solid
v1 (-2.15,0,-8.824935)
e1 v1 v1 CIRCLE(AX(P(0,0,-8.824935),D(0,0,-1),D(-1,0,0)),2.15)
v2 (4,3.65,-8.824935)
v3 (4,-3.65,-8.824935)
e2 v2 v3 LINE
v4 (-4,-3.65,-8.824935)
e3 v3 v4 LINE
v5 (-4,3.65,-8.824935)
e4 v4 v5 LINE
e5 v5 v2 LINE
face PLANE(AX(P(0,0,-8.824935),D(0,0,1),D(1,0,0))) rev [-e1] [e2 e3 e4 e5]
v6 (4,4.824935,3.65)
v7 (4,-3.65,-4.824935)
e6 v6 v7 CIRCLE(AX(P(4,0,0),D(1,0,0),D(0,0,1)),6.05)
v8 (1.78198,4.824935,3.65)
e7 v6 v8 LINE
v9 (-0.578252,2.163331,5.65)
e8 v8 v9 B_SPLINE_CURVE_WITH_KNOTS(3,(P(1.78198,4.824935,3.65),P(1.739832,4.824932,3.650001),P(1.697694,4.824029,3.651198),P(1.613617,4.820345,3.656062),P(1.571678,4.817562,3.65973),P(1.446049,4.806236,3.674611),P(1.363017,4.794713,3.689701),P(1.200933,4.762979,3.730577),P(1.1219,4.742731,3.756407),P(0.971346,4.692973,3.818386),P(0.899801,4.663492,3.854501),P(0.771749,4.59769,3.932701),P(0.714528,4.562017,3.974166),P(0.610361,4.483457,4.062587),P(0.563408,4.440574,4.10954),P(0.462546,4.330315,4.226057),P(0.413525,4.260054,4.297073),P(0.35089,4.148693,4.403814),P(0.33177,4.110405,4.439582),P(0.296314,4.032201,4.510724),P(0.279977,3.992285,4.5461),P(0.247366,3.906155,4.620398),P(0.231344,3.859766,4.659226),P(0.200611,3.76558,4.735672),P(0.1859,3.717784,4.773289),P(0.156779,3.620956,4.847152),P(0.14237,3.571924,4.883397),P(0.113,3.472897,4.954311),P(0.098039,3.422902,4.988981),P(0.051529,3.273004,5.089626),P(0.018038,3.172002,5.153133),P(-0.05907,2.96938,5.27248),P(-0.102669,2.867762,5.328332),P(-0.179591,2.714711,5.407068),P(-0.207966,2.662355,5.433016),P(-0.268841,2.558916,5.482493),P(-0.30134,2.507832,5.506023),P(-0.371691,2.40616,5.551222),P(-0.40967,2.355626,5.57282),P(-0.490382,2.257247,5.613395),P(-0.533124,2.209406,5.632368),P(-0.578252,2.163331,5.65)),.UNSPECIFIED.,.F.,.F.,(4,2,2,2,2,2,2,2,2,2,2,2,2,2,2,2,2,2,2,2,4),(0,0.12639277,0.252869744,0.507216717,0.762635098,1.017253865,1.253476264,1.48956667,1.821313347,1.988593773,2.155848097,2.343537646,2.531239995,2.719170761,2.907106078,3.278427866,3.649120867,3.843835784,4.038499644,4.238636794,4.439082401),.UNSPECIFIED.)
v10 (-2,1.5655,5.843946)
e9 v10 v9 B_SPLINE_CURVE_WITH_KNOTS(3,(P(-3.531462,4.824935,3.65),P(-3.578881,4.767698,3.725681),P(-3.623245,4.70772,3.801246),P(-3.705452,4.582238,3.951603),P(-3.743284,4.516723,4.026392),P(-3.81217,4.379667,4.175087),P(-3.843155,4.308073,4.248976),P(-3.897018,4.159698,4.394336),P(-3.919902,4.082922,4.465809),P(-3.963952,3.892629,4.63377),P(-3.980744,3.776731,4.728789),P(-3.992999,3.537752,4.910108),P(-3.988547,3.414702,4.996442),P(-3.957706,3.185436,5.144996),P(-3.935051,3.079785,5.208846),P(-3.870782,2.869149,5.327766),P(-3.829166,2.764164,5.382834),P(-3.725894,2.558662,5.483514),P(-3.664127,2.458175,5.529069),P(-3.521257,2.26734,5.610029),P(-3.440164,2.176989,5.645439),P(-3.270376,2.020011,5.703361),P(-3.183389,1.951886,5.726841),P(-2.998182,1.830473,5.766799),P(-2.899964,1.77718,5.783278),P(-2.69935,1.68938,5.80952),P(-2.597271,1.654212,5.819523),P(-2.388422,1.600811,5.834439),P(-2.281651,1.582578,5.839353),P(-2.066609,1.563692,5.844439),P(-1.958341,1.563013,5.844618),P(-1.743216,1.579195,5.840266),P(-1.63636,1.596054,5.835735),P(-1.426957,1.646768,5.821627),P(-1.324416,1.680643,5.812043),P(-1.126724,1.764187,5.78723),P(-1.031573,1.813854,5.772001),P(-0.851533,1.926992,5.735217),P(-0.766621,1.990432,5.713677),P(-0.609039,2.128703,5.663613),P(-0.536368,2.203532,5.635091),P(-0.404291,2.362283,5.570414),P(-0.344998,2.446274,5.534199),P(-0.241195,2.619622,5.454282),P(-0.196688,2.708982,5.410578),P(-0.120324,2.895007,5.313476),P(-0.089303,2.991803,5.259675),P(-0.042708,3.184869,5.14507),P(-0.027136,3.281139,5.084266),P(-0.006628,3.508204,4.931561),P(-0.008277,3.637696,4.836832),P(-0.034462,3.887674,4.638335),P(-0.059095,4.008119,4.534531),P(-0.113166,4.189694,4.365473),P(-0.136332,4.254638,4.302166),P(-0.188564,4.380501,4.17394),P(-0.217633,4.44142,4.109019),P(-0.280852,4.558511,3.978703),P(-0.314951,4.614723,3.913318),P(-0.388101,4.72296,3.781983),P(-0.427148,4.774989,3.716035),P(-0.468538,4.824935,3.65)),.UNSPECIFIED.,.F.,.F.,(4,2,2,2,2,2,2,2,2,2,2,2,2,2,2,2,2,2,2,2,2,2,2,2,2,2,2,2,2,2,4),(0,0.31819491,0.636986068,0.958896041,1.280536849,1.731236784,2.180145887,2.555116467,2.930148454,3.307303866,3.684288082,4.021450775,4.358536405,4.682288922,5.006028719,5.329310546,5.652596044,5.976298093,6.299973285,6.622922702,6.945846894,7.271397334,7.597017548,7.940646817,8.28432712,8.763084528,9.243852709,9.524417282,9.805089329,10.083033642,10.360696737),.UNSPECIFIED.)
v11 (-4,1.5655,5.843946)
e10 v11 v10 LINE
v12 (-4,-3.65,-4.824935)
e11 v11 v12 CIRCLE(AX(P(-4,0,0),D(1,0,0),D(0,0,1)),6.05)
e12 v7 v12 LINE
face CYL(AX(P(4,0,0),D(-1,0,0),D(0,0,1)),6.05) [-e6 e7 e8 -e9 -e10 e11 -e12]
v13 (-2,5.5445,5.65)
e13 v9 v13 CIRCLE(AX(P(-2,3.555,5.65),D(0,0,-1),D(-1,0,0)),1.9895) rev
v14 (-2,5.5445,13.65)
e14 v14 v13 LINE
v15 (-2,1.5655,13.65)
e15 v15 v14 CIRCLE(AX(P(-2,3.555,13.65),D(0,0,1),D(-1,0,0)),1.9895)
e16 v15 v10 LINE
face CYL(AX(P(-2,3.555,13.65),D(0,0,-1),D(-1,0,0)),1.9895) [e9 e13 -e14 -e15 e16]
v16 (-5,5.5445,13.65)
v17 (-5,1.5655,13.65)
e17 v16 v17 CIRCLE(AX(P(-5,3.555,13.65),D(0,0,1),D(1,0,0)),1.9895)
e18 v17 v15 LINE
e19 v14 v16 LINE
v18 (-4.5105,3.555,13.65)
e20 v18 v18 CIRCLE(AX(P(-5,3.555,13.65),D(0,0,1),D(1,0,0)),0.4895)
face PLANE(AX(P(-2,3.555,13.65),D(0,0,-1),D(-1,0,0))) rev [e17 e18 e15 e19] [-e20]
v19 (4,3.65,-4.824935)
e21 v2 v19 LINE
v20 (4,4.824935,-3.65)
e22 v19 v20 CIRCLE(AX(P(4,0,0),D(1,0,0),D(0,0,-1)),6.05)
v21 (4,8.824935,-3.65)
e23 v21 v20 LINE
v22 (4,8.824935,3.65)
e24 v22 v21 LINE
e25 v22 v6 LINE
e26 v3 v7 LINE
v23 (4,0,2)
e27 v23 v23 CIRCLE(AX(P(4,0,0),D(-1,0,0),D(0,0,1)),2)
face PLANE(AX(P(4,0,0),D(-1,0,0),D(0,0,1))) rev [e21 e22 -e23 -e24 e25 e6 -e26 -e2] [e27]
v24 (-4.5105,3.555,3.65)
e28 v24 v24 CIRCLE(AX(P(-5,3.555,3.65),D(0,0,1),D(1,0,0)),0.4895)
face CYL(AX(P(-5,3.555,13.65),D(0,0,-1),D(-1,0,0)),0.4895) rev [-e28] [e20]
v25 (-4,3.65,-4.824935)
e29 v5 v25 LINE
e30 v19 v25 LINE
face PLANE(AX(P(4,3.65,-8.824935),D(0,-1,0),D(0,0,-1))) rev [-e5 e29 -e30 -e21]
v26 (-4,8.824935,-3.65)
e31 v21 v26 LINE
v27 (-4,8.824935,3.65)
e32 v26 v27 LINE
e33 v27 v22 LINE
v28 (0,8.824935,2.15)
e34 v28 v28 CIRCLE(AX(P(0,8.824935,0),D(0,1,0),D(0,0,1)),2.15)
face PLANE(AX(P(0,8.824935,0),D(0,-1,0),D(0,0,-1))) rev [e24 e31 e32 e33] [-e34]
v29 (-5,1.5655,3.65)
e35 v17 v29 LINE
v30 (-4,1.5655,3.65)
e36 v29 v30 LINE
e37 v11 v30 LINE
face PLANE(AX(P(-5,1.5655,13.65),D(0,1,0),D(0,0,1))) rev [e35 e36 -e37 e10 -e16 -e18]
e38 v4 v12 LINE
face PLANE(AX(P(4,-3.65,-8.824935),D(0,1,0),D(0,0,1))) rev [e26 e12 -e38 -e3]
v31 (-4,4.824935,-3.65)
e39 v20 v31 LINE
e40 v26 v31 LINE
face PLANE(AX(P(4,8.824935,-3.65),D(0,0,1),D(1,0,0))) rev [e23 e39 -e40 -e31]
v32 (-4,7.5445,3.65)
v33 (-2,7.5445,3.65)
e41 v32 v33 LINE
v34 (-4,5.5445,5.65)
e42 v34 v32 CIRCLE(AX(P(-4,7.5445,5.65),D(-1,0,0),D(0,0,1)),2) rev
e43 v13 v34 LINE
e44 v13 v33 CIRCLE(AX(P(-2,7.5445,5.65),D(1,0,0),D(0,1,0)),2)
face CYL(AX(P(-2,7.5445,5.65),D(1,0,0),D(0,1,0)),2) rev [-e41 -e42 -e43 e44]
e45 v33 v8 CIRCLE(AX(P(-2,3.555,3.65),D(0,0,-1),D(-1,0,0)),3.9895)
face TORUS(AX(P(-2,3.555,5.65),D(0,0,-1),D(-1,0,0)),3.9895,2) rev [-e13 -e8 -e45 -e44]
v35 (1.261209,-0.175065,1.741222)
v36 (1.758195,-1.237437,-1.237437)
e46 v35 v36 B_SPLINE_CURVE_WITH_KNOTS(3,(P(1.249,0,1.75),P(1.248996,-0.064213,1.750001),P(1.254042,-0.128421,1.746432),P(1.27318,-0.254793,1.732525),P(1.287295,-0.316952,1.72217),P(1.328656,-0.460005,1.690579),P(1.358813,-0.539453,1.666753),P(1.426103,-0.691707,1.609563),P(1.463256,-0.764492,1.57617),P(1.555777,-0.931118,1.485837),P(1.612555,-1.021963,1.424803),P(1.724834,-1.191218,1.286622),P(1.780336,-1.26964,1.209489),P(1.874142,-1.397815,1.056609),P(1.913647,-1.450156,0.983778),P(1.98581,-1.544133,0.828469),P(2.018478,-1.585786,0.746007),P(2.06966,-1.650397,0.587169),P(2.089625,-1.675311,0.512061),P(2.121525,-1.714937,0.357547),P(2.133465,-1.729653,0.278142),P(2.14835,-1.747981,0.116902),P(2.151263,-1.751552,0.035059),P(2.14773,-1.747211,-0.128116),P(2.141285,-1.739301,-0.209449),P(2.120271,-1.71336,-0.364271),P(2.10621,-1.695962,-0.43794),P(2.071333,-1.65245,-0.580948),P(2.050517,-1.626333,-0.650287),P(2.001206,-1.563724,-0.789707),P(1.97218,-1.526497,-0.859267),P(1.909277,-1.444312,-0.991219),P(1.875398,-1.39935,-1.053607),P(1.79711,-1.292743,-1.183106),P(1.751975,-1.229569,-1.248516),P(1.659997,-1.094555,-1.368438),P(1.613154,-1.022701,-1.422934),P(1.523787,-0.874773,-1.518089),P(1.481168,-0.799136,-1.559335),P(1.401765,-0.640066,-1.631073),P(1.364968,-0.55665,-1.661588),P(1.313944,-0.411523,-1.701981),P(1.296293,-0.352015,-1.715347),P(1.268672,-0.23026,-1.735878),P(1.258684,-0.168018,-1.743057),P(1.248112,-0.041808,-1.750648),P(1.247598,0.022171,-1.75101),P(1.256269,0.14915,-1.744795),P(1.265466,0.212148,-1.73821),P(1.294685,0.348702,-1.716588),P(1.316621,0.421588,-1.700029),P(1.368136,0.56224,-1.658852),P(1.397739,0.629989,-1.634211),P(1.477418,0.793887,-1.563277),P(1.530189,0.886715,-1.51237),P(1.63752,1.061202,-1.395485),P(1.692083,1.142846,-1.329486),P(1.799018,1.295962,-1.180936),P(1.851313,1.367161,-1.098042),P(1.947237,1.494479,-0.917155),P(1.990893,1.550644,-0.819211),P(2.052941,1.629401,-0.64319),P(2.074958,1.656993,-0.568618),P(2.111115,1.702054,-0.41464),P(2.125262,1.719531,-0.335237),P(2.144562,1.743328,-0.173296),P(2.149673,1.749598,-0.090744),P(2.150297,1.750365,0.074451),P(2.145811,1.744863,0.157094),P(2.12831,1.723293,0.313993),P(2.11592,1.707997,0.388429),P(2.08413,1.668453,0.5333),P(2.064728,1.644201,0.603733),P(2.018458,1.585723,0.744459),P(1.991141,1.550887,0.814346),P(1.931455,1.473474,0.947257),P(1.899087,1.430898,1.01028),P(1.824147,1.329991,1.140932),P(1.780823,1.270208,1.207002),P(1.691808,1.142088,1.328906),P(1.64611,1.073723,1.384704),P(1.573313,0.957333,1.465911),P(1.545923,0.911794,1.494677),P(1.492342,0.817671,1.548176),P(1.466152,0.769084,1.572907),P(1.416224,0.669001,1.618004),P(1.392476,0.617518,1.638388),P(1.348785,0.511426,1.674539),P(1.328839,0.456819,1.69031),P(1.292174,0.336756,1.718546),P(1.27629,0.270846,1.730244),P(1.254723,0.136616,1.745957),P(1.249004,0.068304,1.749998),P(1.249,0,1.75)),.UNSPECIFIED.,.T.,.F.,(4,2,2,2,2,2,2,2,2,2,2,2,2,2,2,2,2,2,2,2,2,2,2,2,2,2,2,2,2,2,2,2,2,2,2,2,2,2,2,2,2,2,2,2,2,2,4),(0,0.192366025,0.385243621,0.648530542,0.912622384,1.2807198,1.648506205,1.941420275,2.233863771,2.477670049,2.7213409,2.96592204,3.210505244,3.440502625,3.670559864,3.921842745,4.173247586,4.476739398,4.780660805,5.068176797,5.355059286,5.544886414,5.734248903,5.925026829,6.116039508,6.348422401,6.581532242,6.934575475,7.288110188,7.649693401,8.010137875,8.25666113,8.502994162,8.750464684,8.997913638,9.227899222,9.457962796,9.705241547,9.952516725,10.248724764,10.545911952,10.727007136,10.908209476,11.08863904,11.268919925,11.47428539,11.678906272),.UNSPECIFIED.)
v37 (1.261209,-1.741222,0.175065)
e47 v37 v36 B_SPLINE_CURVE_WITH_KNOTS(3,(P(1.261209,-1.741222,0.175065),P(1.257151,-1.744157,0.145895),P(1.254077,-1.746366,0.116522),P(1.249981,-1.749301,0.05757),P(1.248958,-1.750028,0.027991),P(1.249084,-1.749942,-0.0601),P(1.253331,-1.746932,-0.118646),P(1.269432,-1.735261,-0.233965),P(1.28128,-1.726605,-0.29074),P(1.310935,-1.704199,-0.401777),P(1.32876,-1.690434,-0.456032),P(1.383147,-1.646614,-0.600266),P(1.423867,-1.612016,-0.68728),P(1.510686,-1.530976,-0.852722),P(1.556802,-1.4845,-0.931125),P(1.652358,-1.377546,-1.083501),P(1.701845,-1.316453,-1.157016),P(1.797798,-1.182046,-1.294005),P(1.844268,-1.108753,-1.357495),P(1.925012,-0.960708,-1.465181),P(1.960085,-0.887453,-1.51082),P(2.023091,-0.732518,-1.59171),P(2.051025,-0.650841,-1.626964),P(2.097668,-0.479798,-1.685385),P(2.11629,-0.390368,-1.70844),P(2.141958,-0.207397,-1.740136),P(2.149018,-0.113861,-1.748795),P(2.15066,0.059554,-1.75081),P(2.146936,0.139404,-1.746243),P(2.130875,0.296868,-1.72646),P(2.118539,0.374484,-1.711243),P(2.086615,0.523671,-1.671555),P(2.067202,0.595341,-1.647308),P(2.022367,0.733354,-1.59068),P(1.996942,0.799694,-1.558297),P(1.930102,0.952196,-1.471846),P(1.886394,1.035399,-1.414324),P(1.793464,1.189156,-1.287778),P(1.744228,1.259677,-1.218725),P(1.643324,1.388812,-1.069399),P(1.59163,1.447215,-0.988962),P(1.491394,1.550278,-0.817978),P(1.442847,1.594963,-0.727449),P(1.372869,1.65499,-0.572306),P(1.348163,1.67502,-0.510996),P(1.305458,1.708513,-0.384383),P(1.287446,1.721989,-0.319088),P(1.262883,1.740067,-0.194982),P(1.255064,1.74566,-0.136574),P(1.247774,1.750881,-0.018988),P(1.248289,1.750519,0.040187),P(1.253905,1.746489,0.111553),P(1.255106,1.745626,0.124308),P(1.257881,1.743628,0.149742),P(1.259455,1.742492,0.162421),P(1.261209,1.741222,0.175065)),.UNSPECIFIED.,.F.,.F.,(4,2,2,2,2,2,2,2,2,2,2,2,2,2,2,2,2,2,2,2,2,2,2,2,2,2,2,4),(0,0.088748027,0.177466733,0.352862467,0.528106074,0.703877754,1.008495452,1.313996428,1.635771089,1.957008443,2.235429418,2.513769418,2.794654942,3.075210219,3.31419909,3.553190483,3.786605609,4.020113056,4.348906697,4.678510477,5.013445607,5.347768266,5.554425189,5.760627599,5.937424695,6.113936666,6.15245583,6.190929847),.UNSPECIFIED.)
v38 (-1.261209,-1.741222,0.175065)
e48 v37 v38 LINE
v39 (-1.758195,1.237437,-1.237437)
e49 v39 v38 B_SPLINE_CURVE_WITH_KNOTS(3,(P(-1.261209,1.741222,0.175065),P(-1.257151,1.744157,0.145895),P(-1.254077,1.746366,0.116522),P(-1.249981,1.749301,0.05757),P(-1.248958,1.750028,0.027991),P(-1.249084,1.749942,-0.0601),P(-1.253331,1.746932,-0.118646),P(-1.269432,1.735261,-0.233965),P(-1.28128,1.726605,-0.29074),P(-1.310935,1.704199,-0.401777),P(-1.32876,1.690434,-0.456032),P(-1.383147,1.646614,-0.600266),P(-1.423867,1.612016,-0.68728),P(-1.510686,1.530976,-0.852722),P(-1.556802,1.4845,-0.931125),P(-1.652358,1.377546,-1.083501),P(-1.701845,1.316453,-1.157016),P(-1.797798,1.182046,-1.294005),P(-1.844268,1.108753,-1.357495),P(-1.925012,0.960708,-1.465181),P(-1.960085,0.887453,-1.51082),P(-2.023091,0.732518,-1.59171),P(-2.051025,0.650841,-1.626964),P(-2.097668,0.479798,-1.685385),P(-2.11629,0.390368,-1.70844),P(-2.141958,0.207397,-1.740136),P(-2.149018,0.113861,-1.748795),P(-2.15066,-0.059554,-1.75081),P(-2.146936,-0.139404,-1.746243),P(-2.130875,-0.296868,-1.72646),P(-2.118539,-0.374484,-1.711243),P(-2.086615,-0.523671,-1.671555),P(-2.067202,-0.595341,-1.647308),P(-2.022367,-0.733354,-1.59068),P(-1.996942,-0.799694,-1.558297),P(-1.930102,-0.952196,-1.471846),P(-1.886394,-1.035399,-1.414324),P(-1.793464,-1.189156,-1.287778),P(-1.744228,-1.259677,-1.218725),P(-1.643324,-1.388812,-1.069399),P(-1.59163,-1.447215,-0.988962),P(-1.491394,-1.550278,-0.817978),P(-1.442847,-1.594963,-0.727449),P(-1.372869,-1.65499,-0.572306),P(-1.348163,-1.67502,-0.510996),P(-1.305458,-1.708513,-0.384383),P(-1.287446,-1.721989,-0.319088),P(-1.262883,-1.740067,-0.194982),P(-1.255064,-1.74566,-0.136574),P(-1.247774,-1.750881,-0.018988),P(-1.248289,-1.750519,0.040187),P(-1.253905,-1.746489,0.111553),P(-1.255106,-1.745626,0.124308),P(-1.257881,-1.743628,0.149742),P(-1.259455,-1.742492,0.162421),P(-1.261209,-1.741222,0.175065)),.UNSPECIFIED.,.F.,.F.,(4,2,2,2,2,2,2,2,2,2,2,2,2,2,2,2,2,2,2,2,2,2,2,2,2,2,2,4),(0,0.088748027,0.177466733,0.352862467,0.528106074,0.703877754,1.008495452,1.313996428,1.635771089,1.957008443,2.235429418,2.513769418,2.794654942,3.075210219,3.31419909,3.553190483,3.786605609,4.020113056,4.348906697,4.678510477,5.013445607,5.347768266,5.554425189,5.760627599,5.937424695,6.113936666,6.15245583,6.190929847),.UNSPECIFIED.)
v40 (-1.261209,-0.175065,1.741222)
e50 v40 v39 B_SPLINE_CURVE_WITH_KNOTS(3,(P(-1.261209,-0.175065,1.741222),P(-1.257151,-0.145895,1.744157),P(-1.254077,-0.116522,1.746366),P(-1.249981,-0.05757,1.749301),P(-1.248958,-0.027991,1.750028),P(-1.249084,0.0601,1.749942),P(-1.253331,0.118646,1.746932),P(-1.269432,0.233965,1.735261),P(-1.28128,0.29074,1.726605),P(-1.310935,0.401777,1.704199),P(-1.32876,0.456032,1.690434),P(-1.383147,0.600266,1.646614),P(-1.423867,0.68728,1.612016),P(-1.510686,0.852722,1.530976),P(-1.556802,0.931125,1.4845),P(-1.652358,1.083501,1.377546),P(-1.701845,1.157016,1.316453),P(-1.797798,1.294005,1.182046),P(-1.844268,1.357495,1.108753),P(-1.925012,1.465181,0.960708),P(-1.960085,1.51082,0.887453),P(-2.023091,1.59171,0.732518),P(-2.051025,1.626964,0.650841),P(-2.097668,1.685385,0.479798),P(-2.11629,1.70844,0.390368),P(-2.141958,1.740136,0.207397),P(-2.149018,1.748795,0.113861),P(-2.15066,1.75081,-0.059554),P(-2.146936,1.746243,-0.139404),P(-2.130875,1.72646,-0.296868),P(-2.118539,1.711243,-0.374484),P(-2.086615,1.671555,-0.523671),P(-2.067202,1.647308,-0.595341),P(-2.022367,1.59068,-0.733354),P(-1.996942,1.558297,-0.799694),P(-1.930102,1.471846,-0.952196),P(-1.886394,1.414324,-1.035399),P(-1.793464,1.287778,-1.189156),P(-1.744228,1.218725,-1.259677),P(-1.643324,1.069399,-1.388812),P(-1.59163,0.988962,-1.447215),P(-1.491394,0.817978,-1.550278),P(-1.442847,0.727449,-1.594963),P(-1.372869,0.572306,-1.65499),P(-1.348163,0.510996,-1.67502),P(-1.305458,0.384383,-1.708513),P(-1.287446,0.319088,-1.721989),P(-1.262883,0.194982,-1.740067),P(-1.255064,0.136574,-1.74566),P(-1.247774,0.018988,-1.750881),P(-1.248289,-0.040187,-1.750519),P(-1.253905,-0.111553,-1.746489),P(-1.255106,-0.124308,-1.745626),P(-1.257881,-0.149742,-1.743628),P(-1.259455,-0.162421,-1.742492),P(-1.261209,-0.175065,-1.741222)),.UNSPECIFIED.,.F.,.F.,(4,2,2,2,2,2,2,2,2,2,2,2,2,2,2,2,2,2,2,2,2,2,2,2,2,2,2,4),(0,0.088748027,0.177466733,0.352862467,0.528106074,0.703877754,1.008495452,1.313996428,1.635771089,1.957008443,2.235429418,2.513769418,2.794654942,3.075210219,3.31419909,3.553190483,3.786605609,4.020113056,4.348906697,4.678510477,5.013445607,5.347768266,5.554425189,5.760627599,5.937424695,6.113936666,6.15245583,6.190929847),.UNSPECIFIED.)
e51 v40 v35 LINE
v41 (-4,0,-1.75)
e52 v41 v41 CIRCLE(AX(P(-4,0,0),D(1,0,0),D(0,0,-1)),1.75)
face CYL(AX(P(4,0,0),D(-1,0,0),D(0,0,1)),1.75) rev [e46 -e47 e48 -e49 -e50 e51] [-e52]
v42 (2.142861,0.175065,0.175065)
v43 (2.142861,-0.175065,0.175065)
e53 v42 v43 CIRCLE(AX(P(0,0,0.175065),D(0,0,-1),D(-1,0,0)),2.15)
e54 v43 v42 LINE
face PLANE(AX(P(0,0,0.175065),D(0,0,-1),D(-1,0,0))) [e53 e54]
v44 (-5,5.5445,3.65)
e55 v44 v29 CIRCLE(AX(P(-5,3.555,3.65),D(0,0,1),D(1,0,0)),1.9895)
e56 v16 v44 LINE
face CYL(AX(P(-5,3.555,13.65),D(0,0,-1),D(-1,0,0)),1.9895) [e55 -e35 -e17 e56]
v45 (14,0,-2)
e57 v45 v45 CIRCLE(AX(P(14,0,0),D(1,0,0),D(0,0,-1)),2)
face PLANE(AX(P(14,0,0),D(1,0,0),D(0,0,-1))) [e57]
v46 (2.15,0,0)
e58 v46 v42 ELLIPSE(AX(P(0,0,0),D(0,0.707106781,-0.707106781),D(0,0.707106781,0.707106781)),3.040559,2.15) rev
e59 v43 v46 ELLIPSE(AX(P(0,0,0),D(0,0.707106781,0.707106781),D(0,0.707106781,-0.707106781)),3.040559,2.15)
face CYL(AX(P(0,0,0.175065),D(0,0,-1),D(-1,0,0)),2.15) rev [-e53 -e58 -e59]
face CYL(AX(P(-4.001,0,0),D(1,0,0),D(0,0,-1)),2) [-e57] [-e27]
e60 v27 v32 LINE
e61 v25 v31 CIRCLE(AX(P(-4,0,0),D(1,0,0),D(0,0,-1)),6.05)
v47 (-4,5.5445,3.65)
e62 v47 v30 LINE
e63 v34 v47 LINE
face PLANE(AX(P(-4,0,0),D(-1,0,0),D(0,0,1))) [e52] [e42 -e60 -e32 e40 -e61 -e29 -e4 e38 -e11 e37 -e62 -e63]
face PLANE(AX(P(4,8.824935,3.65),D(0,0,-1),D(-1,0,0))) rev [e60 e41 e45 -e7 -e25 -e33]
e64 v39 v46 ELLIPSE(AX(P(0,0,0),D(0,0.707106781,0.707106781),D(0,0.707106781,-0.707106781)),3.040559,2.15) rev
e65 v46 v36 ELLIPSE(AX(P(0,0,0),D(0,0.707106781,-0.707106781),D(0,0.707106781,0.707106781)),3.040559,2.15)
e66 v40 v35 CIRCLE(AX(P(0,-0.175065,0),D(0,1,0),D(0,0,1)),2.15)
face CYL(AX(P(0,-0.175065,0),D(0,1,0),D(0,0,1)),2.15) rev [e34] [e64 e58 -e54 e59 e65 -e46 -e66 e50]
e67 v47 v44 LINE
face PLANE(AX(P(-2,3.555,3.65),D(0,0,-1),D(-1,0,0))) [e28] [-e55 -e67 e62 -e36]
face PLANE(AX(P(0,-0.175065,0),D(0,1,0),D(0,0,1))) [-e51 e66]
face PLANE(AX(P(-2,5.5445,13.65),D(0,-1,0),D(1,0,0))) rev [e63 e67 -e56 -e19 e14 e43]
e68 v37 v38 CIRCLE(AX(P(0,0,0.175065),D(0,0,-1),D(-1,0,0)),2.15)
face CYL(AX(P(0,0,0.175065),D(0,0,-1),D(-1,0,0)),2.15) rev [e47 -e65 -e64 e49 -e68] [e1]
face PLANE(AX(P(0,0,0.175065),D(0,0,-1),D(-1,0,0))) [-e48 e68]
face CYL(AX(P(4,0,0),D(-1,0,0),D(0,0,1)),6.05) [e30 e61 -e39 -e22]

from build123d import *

# Parameters (mm, degrees)
SKETCH1_R               = 1.75
BOSS_EXTRUDE1_DEPTH     = 4
SKETCH2_R               = 2.15
CUT_EXTRUDE1_DEPTH      = 5
BOSS_EXTRUDE5_START     = -1.8499999
BOSS_EXTRUDE5_OUTLINE_R = 2
BOSS_EXTRUDE5_DEPTH     = 11.8499999
BOSS_EXTRUDE5_START_2   = -3
BOSS_EXTRUDE5_2_DEPTH   = 7.824935333
SKETCH3_R               = 2.15
CUT_EXTRUDE2_DEPTH      = 5
BOSS_EXTRUDE2_START     = 4
SKETCH4_W               = 8
SKETCH4_H               = 7.3
SKETCH4_R               = 2.15
BOSS_EXTRUDE2_DEPTH     = 4
BOSS_EXTRUDE3_START     = 4
SKETCH5_W               = 8
SKETCH5_H               = 7.3
SKETCH5_R               = 2.15
BOSS_EXTRUDE3_DEPTH     = 4
SKETCH6_R               = 0.4895
BOSS_EXTRUDE4_DEPTH     = 10
FILLET1_R               = 2


with BuildPart() as part:
    # Sketch1 → Boss-Extrude1 (new, symmetric)
    with BuildSketch(Plane(origin=(0, 0, 0), x_dir=(0, 0, -1), z_dir=(1, 0, 0))):
        with BuildLine():
            Line((-3.65, 4.824935233), (3.65, 4.824935233))
            ThreePointArc((3.65, 4.824935233), (4.277996026, 4.277996026), (4.824935233, 3.65))
            Line((4.824935233, 3.65), (4.824935233, -3.65))
            ThreePointArc((4.824935233, -3.65), (-4.277996026, -4.277996026), (-3.65, 4.824935233))
        make_face()
        Circle(SKETCH1_R, mode=Mode.SUBTRACT)
    extrude(amount=BOSS_EXTRUDE1_DEPTH, both=True)

    # Sketch2 → Cut-Extrude1 (cut)
    with BuildSketch(Plane(origin=(0, 4.824935233, 0), x_dir=(1, 0, 0), z_dir=(0, 1, 0))):
        with Locations(Location((0, 0, 0), (0, 0, 270))):
            Circle(SKETCH2_R)
    extrude(amount=-CUT_EXTRUDE1_DEPTH, mode=Mode.SUBTRACT)

    # Boss-Extrude5: read off the stored shape, not the designer's step
    # Boss-Extrude5 outline → Boss-Extrude5 (add)
    with BuildSketch(Plane(origin=(4, 0, 0), x_dir=(0, 0, -1), z_dir=(1, 0, 0)).offset(BOSS_EXTRUDE5_START)):
        Circle(BOSS_EXTRUDE5_OUTLINE_R)
    extrude(amount=BOSS_EXTRUDE5_DEPTH)

    # Boss-Extrude5 2 outline → Boss-Extrude5 2 (add)
    with BuildSketch(Plane(origin=(0, 0, 0), x_dir=(1, 0, 0), z_dir=(0, 1, 0)).offset(BOSS_EXTRUDE5_START_2)):
        with BuildLine():
            Line((2.1500001, -3), (2.15, 0))
            ThreePointArc((2.15, 0), (1.52027958, -1.52027958), (0, -2.15))
            Line((0, -2.15), (0, -3))
            Line((0, -3), (2.1500001, -3))
        make_face()
        with BuildLine():
            ThreePointArc((0, 2.15), (1.52027958, 1.52027958), (2.15, 0))
            Line((2.15, 0), (2.1500001, 3))
            Line((2.1500001, 3), (0, 3))
            Line((0, 3), (0, 2.15))
        make_face()
    extrude(amount=BOSS_EXTRUDE5_2_DEPTH)

    # Sketch3 → Cut-Extrude2 (cut)
    with BuildSketch(Plane(origin=(0, 0, -4.824935233), x_dir=(-1, 0, 0), z_dir=(0, 0, -1))):
        Circle(SKETCH3_R)
    extrude(amount=-CUT_EXTRUDE2_DEPTH, mode=Mode.SUBTRACT)

    # Sketch4 → Boss-Extrude2 (add)
    with BuildSketch(Plane(origin=(0, 4.824935233, 0), x_dir=(1, 0, 0), z_dir=(0, 1, 0)).offset(BOSS_EXTRUDE2_START)):
        Rectangle(SKETCH4_W, SKETCH4_H)
        with Locations(Location((0, 0, 0), (0, 0, 270))):
            Circle(SKETCH4_R, mode=Mode.SUBTRACT)
    extrude(amount=-BOSS_EXTRUDE2_DEPTH)

    # Sketch5 → Boss-Extrude3 (add)
    with BuildSketch(Plane(origin=(0, 0, -4.824935233), x_dir=(-1, 0, 0), z_dir=(0, 0, -1)).offset(BOSS_EXTRUDE3_START)):
        Rectangle(SKETCH5_W, SKETCH5_H)
        Circle(SKETCH5_R, mode=Mode.SUBTRACT)
    extrude(amount=-BOSS_EXTRUDE3_DEPTH)

    # Sketch6 → Boss-Extrude4 (add)
    with BuildSketch(Plane.XY.offset(3.65)):
        with BuildLine():
            Line((-2, 5.5445), (-5, 5.5445))
            ThreePointArc((-5, 5.5445), (-6.9895, 3.555), (-5, 1.5655))
            Line((-5, 1.5655), (-2, 1.5655))
            ThreePointArc((-2, 1.5655), (-0.0105, 3.555), (-2, 5.5445))
        make_face()
        with Locations((-5, 3.555)):
            Circle(SKETCH6_R, mode=Mode.SUBTRACT)
    extrude(amount=BOSS_EXTRUDE4_DEPTH)

    # Fillet1
    # the kernel refuses this fillet: 2 mm, written as the material it adds along each edge
    with BuildSketch(Plane(origin=(-2, 3.555, 3.65), x_dir=(-0.2477928617675286, -0.9688130354495952, 0), z_dir=(-0.9688130354495952, 0.2477928617675286, 0))) as fillet1_piece_1:
        with BuildLine():
            CenterArc((1.9895 + FILLET1_R, FILLET1_R), FILLET1_R, 180, 90)
            Line((1.9895 + FILLET1_R, 0), (1.9895, 0))
            Line((1.9895, 0), (1.9895, FILLET1_R))
        make_face()
    revolve(axis=Axis((-2, 3.555, 3.65), (0, 0, 1)), revolution_arc=194.346943464)
    with BuildSketch(Plane(origin=(-2, 5.5445, 3.65), x_dir=(0, 0, 1), z_dir=(-1, 0, 0))) as fillet1_piece_2:
        with BuildLine():
            CenterArc((FILLET1_R, FILLET1_R), FILLET1_R, 180, 90)
            Line((0, FILLET1_R), (0, 0))
            Line((0, 0), (FILLET1_R, 0))
        make_face()
    extrude(amount=2)


solid = part.part
